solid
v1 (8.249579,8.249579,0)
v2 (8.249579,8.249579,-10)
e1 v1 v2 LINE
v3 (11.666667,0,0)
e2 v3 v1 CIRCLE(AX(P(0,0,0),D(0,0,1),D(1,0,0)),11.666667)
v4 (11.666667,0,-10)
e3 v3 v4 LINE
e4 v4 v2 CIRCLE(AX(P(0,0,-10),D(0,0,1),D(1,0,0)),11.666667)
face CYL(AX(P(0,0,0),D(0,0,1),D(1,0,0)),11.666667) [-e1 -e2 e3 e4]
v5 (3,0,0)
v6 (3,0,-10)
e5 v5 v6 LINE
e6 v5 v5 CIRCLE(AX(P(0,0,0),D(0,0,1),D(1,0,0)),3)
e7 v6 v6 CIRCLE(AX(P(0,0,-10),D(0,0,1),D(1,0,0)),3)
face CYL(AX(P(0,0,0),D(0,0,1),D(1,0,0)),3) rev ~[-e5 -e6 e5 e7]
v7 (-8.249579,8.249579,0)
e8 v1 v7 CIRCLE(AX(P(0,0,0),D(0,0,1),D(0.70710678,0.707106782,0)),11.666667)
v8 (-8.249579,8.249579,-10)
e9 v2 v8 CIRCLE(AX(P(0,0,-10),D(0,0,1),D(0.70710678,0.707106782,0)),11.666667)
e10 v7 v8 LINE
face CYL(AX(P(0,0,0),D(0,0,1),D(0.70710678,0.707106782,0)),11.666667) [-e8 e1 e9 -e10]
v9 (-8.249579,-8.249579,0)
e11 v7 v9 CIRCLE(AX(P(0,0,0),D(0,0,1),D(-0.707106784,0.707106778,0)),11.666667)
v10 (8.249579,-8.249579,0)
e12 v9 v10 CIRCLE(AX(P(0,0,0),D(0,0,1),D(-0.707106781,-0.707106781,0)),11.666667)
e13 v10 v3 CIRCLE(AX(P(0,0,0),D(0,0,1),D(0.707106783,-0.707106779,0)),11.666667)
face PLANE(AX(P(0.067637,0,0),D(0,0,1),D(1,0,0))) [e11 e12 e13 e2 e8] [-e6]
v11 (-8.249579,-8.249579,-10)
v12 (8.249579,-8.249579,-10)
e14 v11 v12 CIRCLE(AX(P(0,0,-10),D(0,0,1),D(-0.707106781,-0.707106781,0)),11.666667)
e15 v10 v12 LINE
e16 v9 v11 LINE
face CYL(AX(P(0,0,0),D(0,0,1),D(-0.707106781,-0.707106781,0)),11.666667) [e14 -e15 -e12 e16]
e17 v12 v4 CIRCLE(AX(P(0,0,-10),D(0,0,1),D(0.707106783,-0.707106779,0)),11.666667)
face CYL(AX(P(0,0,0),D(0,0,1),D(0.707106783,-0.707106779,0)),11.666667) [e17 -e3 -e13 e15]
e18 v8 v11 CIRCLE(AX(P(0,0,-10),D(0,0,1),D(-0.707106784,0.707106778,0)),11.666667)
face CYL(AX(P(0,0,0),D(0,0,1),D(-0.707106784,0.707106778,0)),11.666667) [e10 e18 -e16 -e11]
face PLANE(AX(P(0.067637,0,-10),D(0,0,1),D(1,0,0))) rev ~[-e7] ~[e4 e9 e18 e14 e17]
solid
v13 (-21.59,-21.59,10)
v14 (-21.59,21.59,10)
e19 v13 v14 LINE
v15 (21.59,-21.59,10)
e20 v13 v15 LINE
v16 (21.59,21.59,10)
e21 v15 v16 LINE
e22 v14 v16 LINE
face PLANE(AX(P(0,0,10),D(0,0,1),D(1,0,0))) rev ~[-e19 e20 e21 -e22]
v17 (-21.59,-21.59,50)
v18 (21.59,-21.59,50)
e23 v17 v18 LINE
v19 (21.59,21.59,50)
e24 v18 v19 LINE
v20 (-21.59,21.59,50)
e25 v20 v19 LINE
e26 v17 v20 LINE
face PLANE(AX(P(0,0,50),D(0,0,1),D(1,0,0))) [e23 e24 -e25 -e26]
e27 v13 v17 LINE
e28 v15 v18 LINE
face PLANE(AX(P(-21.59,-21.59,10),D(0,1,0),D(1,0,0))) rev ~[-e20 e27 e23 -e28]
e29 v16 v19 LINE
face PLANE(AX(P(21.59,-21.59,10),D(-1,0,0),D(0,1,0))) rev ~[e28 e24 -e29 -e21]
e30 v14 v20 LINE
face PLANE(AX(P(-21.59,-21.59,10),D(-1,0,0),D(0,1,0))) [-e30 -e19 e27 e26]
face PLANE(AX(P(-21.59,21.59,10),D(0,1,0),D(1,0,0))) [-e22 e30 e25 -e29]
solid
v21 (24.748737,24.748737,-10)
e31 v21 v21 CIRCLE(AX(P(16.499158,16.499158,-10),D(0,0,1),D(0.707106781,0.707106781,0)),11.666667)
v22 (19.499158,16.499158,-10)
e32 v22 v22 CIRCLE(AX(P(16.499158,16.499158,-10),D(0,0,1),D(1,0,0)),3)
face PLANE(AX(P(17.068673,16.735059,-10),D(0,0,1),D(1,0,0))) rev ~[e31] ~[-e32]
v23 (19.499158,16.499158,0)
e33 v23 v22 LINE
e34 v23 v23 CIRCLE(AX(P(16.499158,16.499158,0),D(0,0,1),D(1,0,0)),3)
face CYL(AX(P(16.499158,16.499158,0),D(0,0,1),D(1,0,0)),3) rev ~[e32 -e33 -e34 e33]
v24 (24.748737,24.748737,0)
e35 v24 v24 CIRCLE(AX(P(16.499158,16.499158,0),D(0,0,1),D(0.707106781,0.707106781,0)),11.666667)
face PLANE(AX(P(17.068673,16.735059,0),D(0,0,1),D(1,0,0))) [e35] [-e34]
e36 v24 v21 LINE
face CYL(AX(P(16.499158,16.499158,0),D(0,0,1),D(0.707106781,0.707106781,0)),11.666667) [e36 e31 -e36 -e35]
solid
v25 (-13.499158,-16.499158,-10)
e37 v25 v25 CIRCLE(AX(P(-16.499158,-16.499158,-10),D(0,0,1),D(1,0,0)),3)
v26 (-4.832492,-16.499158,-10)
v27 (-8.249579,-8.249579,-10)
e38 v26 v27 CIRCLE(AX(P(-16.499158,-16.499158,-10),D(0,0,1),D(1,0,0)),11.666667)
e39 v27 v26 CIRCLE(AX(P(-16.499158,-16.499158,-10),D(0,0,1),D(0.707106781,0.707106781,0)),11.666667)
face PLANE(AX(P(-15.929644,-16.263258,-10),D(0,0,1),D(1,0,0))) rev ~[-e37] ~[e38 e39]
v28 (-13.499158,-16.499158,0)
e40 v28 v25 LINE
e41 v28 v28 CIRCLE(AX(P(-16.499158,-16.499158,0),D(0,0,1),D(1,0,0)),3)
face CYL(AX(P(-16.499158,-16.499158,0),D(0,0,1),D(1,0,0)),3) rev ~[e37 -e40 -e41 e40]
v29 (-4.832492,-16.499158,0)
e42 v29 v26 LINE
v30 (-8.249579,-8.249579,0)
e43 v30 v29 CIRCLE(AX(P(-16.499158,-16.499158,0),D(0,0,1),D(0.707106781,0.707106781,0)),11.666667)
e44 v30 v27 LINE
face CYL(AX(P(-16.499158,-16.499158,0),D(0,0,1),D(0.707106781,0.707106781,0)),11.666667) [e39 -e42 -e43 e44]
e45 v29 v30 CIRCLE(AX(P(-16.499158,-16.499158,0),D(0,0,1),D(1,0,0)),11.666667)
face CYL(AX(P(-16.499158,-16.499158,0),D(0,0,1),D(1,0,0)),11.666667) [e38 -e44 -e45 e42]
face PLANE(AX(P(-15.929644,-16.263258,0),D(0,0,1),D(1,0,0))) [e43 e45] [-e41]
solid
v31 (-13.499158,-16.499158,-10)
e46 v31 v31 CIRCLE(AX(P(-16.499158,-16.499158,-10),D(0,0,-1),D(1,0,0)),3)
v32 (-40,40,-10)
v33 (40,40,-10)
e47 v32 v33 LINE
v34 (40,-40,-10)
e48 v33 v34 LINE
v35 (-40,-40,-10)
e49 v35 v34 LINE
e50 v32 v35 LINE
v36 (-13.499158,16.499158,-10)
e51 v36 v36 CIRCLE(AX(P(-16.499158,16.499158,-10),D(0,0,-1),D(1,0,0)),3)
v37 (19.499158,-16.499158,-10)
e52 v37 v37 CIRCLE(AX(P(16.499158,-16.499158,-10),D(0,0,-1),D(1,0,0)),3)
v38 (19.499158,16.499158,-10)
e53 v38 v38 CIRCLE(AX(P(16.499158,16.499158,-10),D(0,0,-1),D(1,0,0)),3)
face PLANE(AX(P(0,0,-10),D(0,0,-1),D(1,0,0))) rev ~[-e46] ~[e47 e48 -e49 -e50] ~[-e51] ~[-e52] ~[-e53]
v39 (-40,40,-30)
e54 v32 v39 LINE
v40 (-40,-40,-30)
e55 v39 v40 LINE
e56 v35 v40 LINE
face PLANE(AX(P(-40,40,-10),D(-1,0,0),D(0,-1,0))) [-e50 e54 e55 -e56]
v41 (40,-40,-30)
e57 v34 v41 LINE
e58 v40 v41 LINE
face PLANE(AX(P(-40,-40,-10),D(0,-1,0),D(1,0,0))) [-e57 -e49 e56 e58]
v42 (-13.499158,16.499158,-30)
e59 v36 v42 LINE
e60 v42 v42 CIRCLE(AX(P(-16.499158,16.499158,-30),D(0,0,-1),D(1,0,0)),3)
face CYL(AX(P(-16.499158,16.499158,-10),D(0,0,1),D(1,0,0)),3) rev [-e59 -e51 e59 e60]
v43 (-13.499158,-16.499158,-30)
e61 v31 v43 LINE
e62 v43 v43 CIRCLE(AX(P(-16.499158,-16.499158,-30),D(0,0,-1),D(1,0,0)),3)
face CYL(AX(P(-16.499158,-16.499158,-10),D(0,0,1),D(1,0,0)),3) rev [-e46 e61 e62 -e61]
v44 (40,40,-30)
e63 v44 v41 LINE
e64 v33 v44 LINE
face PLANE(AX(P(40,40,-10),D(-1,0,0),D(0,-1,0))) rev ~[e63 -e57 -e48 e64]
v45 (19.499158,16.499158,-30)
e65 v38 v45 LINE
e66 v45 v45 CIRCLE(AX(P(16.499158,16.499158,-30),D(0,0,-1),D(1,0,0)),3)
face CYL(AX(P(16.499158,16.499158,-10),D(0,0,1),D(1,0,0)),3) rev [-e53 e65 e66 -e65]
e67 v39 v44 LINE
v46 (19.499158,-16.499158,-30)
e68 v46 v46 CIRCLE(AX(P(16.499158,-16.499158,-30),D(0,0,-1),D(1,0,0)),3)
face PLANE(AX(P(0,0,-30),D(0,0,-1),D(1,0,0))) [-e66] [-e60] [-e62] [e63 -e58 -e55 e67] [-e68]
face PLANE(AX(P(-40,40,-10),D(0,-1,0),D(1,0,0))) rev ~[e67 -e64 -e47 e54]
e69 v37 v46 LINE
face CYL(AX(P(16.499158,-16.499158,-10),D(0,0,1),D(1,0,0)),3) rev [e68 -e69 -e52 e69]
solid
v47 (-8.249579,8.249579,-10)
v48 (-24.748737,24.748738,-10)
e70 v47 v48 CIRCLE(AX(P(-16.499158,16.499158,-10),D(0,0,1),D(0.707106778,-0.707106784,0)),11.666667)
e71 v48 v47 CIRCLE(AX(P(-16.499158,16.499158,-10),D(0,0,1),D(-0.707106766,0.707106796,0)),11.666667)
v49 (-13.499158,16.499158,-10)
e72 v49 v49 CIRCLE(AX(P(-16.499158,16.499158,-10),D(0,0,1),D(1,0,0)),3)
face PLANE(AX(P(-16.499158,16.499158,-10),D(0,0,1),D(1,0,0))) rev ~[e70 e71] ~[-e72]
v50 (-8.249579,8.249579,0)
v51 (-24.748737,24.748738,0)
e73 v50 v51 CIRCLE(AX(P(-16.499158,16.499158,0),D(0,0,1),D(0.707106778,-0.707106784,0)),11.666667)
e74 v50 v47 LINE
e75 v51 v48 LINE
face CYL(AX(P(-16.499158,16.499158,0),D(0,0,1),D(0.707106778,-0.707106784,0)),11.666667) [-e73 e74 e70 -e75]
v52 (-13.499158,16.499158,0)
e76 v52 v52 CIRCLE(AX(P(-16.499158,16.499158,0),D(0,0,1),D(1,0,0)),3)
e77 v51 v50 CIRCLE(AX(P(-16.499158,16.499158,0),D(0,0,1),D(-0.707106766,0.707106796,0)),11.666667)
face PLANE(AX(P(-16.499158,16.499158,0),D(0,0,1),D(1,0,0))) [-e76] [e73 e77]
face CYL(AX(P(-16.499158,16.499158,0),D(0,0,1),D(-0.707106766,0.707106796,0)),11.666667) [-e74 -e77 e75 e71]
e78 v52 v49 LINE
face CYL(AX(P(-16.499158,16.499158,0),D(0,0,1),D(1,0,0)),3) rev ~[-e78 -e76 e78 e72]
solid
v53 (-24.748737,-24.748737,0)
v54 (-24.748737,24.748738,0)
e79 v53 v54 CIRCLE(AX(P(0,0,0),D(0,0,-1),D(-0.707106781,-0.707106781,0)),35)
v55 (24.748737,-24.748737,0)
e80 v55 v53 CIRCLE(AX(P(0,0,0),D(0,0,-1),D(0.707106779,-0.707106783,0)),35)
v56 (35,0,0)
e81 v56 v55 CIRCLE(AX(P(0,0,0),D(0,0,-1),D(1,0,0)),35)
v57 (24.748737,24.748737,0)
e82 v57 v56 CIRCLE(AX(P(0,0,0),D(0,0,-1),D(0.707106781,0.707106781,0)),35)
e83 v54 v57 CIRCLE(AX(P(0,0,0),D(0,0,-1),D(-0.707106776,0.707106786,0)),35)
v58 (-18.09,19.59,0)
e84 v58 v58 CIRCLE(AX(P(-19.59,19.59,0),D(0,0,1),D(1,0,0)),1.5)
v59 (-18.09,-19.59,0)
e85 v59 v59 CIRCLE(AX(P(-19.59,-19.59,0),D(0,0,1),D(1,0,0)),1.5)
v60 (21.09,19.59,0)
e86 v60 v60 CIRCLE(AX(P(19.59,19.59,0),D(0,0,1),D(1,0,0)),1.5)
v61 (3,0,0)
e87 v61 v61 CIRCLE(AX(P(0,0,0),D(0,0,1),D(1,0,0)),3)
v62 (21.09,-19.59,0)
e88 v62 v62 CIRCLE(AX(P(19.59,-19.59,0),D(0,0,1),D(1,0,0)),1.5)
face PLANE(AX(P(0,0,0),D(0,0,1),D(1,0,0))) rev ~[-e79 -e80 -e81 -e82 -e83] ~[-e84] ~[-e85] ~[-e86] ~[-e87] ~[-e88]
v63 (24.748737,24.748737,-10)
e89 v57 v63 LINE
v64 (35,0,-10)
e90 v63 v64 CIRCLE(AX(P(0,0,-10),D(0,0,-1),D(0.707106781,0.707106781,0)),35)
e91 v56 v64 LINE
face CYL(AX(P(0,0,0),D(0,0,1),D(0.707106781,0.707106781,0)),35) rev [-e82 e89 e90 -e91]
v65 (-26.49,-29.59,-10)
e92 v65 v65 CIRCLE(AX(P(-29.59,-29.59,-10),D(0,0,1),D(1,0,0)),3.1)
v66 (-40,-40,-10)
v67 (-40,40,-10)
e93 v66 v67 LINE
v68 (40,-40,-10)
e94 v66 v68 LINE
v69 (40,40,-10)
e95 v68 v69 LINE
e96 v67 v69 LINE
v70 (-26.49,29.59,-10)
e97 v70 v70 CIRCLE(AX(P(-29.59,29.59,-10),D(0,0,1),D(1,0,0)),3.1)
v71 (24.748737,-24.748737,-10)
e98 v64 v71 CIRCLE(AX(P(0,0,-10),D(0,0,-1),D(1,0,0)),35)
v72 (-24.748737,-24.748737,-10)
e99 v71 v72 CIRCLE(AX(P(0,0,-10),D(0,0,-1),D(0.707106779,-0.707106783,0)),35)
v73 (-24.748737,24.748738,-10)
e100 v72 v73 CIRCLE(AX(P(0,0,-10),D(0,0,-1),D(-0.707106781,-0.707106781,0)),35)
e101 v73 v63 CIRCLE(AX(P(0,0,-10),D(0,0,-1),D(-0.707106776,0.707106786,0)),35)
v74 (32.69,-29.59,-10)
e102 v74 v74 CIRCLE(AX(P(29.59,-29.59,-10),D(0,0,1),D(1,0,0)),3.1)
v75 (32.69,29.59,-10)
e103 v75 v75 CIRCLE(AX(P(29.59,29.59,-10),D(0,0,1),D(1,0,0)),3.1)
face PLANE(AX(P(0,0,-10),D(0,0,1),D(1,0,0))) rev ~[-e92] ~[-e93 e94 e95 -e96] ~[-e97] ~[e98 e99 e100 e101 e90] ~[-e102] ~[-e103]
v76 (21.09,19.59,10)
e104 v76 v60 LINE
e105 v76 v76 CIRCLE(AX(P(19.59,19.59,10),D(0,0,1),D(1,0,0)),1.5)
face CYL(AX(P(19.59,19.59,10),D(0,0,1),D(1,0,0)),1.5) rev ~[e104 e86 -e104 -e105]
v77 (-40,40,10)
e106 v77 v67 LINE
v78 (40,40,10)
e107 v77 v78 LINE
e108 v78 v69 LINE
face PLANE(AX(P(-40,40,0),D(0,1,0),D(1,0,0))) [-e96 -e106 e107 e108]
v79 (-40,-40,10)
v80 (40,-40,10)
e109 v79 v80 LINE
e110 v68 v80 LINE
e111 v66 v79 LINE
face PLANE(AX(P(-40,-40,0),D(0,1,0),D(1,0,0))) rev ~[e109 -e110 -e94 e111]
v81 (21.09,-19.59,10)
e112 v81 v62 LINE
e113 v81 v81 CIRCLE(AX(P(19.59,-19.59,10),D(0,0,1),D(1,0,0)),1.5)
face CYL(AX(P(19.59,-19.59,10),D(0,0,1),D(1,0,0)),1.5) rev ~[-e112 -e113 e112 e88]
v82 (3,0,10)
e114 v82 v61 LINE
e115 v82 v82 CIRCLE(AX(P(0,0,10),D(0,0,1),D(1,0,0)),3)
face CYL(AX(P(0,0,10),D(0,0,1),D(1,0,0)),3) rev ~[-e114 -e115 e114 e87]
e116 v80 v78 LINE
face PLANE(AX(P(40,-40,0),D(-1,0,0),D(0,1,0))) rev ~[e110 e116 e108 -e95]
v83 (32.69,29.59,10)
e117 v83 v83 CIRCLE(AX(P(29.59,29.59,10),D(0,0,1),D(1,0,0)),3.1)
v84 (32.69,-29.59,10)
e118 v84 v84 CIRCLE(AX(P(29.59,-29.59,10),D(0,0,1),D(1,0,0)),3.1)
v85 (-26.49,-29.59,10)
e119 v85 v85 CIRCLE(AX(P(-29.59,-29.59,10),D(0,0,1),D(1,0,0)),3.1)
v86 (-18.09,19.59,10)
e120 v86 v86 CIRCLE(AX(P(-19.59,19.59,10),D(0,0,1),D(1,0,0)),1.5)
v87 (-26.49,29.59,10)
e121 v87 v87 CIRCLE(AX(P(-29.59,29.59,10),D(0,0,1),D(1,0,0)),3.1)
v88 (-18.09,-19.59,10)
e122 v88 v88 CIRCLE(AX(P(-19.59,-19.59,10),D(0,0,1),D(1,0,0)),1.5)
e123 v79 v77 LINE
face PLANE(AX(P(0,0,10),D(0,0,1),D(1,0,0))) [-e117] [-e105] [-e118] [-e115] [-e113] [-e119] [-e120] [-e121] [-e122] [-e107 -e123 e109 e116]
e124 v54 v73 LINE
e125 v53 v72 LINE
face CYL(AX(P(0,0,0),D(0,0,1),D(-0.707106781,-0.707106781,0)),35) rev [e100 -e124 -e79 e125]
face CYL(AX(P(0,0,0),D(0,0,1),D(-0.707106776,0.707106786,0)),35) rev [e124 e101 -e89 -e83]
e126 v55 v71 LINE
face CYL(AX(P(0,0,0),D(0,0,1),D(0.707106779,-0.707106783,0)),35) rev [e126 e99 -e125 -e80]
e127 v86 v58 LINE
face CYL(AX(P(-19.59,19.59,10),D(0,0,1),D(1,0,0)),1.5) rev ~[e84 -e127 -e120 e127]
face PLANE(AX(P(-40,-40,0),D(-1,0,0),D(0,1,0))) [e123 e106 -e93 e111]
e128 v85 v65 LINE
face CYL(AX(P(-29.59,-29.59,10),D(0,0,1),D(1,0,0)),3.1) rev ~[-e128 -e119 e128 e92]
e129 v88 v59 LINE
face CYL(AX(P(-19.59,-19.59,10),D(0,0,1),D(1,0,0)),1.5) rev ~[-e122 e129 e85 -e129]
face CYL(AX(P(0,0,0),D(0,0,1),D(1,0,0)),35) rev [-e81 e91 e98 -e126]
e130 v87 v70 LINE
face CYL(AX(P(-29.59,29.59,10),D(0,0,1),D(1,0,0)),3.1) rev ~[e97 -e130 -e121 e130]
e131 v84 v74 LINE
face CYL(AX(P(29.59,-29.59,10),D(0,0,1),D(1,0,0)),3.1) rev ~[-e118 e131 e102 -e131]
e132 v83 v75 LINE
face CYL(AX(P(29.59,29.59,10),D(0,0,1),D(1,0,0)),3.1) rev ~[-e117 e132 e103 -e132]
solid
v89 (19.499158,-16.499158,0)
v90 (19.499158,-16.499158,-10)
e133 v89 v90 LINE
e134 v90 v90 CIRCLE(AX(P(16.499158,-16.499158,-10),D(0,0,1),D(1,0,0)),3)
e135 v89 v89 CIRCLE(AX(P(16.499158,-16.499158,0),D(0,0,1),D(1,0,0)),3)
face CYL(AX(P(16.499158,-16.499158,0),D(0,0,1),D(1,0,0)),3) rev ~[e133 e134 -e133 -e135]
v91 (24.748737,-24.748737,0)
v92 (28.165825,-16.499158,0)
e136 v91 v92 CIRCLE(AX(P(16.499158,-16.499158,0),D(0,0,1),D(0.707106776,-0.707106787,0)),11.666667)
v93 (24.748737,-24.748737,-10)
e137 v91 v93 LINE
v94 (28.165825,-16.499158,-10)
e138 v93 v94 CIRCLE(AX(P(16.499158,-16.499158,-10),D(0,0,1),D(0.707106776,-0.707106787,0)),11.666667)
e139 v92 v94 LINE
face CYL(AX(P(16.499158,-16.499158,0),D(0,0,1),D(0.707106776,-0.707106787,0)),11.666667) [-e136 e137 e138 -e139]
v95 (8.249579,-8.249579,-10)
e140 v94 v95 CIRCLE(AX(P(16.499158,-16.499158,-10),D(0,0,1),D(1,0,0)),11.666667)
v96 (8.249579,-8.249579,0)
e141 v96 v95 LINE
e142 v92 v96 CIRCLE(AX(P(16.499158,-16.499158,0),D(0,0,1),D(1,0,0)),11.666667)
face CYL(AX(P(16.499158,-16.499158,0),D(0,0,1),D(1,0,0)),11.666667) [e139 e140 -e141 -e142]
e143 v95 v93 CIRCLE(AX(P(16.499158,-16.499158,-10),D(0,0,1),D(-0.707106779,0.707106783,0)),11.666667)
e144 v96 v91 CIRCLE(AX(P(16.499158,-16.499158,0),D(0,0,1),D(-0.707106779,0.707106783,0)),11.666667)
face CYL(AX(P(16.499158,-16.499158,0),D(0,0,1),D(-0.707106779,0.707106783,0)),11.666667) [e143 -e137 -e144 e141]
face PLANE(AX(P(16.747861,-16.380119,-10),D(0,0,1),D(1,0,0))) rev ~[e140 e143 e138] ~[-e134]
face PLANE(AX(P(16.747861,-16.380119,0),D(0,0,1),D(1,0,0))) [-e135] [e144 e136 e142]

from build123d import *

# Parameters (mm, degrees)
F0_W     = 80
F0_H     = 80
F1_DEPTH = 10
F0_R     = 3
F2_W     = 80
F2_H     = 80
F2_R     = 3
F3_DEPTH = 20
F4_W     = 80
F4_H     = 80
F5_DEPTH = 10
F6_W     = 43.18
F6_H     = 43.18
F6_R     = 1.5
F6_R_2   = 3
F7_DEPTH = 40
F6_R_3   = 3.1
F8_DEPTH = 25


with BuildPart() as f1:
    # F0 (on Top) → F1 (new body)
    with BuildSketch(Plane.XY):
        Rectangle(F0_W, F0_H)
        with BuildLine():
            ThreePointArc((-24.7487373417, -24.7487373413), (-35, 1.228e-07), (-24.7487371681, 24.748737515))
            ThreePointArc((-24.7487371681, 24.748737515), (1.227e-07, 35), (24.7487373415, 24.7487373415))
            ThreePointArc((24.7487373415, 24.7487373415), (32.3357836379, 13.3939201328), (35, 0))
            ThreePointArc((35, 0), (32.3357836202, -13.3939201755), (24.7487372761, -24.7487374069))
            ThreePointArc((24.7487372761, -24.7487374069), (-4.64e-08, -35), (-24.7487373417, -24.7487373413))
        make_face(mode=Mode.SUBTRACT)
    extrude(amount=-F1_DEPTH)

    # F4 (on face) → F5 (join)
    with BuildSketch(Plane.XY):
        Rectangle(F4_W, F4_H)
    extrude(amount=F5_DEPTH)

    # F6 (on face) → F8 (cut)
    with BuildSketch(Plane.XY.offset(10)):
        with Locations((19.59, -19.59)):
            Circle(F6_R)
        with Locations((-19.59, -19.59)):
            Circle(F6_R)
        with Locations((-19.59, 19.59)):
            Circle(F6_R)
        with Locations((19.59, 19.59)):
            Circle(F6_R)
        Circle(F6_R_2)
        with Locations((-29.59, -29.59)):
            Circle(F6_R_3)
        with Locations((29.59, -29.59)):
            Circle(F6_R_3)
        with Locations((-29.59, 29.59)):
            Circle(F6_R_3)
        with Locations((29.59, 29.59)):
            Circle(F6_R_3)
    extrude(amount=-F8_DEPTH, mode=Mode.SUBTRACT)


with BuildPart() as f1b:
    # F0 (on Top) → F1, piece 2 (new body)
    with BuildSketch(Plane.XY):
        with BuildLine():
            ThreePointArc((-8.2495791516, 8.2495790761), (-5.7205636919, 12.0345181588), (-4.832491561, 16.4991582277))
            ThreePointArc((-4.832491561, 16.4991582277), (-12.0345180701, 27.2777527267), (-24.7487371681, 24.748737515))
            ThreePointArc((-24.7487371681, 24.748737515), (-24.7487374471, 8.2495792195), (-8.2495791516, 8.2495790761))
        make_face()
        with Locations((-16.4991582277, 16.4991582277)):
            Circle(F0_R, mode=Mode.SUBTRACT)
    extrude(amount=-F1_DEPTH)


with BuildPart() as f1c:
    # F0 (on Top) → F1, piece 3 (new body)
    with BuildSketch(Plane.XY):
        with BuildLine():
            ThreePointArc((28.1658248944, 16.4991582277), (27.2777527737, 20.9637982719), (24.7487373415, 24.7487373415))
            ThreePointArc((24.7487373415, 24.7487373415), (8.24957912, 24.7487373477), (8.2495791015, 8.2495791262))
            ThreePointArc((8.2495791015, 8.2495791262), (20.9637982639, 5.7205636784), (28.1658248944, 16.4991582277))
        make_face()
        with Locations((16.4991582277, 16.4991582277)):
            Circle(F0_R, mode=Mode.SUBTRACT)
    extrude(amount=-F1_DEPTH)


with BuildPart() as f1d:
    # F0 (on Top) → F1, piece 4 (new body)
    with BuildSketch(Plane.XY):
        with BuildLine():
            ThreePointArc((-8.2495791138, -8.2495791138), (-24.7487373414, -8.2495791137), (-24.7487373417, -24.7487373413))
            ThreePointArc((-24.7487373417, -24.7487373413), (-12.0345181836, -27.2777527737), (-4.832491561, -16.4991582277))
            ThreePointArc((-4.832491561, -16.4991582277), (-5.7205636817, -12.0345181834), (-8.2495791138, -8.2495791138))
        make_face()
        with Locations((-16.4991582277, -16.4991582277)):
            Circle(F0_R, mode=Mode.SUBTRACT)
    extrude(amount=-F1_DEPTH)


with BuildPart() as f1e:
    # F0 (on Top) → F1, piece 5 (new body)
    with BuildSketch(Plane.XY):
        with BuildLine():
            ThreePointArc((8.2495791392, -8.2495790884), (8.2495790684, -24.7487372961), (24.7487372761, -24.7487374069))
            ThreePointArc((24.7487372761, -24.7487374069), (27.277752756, -20.9637983147), (28.1658248944, -16.4991582277))
            ThreePointArc((28.1658248944, -16.4991582277), (20.9637982885, -5.7205636886), (8.2495791392, -8.2495790884))
        make_face()
        with Locations((16.4991582277, -16.4991582277)):
            Circle(F0_R, mode=Mode.SUBTRACT)
    extrude(amount=-F1_DEPTH)


with BuildPart() as f1f:
    # F0 (on Top) → F1, piece 6 (new body)
    with BuildSketch(Plane.XY):
        with BuildLine():
            ThreePointArc((8.2495791015, 8.2495791262), (-3.54e-08, 11.6666666667), (-8.2495791516, 8.2495790761))
            ThreePointArc((-8.2495791516, 8.2495790761), (-11.6666666667, -2.67e-08), (-8.2495791138, -8.2495791138))
            ThreePointArc((-8.2495791138, -8.2495791138), (1.8e-08, -11.6666666667), (8.2495791392, -8.2495790884))
            ThreePointArc((8.2495791392, -8.2495790884), (10.7785945528, -4.4646400277), (11.6666666667, 0))
            ThreePointArc((11.6666666667, 0), (10.7785945426, 4.4646400523), (8.2495791015, 8.2495791262))
        make_face()
        Circle(F0_R, mode=Mode.SUBTRACT)
    extrude(amount=-F1_DEPTH)


with BuildPart() as f3:
    # F2 (on face) → F3 (new body)
    with BuildSketch(Plane(origin=(0, 0, -10), x_dir=(1, 0, 0), z_dir=(0, 0, -1))):
        Rectangle(F2_W, F2_H)
        with Locations((-16.4991582277, -16.4991582277)):
            Circle(F2_R, mode=Mode.SUBTRACT)
        with Locations((16.4991582277, -16.4991582277)):
            Circle(F2_R, mode=Mode.SUBTRACT)
        with Locations((-16.4991582277, 16.4991582277)):
            Circle(F2_R, mode=Mode.SUBTRACT)
        with Locations((16.4991582277, 16.4991582277)):
            Circle(F2_R, mode=Mode.SUBTRACT)
    extrude(amount=F3_DEPTH)


with BuildPart() as f7:
    # F6 (on face) → F7 (new body)
    with BuildSketch(Plane.XY.offset(10)):
        Rectangle(F6_W, F6_H)
        with Locations((-19.59, -19.59)):
            Circle(F6_R, mode=Mode.SUBTRACT)
        with Locations((19.59, -19.59)):
            Circle(F6_R, mode=Mode.SUBTRACT)
        with Locations((-19.59, 19.59)):
            Circle(F6_R, mode=Mode.SUBTRACT)
        Circle(F6_R_2, mode=Mode.SUBTRACT)
        with Locations((19.59, 19.59)):
            Circle(F6_R, mode=Mode.SUBTRACT)
        Circle(F6_R_2)
        with Locations((19.59, -19.59)):
            Circle(F6_R)
        with Locations((-19.59, -19.59)):
            Circle(F6_R)
        with Locations((-19.59, 19.59)):
            Circle(F6_R)
        with Locations((19.59, 19.59)):
            Circle(F6_R)
    extrude(amount=F7_DEPTH)


solid = Compound([f1.part, f1b.part, f1c.part, f1d.part, f1e.part, f1f.part, f3.part, f7.part])
